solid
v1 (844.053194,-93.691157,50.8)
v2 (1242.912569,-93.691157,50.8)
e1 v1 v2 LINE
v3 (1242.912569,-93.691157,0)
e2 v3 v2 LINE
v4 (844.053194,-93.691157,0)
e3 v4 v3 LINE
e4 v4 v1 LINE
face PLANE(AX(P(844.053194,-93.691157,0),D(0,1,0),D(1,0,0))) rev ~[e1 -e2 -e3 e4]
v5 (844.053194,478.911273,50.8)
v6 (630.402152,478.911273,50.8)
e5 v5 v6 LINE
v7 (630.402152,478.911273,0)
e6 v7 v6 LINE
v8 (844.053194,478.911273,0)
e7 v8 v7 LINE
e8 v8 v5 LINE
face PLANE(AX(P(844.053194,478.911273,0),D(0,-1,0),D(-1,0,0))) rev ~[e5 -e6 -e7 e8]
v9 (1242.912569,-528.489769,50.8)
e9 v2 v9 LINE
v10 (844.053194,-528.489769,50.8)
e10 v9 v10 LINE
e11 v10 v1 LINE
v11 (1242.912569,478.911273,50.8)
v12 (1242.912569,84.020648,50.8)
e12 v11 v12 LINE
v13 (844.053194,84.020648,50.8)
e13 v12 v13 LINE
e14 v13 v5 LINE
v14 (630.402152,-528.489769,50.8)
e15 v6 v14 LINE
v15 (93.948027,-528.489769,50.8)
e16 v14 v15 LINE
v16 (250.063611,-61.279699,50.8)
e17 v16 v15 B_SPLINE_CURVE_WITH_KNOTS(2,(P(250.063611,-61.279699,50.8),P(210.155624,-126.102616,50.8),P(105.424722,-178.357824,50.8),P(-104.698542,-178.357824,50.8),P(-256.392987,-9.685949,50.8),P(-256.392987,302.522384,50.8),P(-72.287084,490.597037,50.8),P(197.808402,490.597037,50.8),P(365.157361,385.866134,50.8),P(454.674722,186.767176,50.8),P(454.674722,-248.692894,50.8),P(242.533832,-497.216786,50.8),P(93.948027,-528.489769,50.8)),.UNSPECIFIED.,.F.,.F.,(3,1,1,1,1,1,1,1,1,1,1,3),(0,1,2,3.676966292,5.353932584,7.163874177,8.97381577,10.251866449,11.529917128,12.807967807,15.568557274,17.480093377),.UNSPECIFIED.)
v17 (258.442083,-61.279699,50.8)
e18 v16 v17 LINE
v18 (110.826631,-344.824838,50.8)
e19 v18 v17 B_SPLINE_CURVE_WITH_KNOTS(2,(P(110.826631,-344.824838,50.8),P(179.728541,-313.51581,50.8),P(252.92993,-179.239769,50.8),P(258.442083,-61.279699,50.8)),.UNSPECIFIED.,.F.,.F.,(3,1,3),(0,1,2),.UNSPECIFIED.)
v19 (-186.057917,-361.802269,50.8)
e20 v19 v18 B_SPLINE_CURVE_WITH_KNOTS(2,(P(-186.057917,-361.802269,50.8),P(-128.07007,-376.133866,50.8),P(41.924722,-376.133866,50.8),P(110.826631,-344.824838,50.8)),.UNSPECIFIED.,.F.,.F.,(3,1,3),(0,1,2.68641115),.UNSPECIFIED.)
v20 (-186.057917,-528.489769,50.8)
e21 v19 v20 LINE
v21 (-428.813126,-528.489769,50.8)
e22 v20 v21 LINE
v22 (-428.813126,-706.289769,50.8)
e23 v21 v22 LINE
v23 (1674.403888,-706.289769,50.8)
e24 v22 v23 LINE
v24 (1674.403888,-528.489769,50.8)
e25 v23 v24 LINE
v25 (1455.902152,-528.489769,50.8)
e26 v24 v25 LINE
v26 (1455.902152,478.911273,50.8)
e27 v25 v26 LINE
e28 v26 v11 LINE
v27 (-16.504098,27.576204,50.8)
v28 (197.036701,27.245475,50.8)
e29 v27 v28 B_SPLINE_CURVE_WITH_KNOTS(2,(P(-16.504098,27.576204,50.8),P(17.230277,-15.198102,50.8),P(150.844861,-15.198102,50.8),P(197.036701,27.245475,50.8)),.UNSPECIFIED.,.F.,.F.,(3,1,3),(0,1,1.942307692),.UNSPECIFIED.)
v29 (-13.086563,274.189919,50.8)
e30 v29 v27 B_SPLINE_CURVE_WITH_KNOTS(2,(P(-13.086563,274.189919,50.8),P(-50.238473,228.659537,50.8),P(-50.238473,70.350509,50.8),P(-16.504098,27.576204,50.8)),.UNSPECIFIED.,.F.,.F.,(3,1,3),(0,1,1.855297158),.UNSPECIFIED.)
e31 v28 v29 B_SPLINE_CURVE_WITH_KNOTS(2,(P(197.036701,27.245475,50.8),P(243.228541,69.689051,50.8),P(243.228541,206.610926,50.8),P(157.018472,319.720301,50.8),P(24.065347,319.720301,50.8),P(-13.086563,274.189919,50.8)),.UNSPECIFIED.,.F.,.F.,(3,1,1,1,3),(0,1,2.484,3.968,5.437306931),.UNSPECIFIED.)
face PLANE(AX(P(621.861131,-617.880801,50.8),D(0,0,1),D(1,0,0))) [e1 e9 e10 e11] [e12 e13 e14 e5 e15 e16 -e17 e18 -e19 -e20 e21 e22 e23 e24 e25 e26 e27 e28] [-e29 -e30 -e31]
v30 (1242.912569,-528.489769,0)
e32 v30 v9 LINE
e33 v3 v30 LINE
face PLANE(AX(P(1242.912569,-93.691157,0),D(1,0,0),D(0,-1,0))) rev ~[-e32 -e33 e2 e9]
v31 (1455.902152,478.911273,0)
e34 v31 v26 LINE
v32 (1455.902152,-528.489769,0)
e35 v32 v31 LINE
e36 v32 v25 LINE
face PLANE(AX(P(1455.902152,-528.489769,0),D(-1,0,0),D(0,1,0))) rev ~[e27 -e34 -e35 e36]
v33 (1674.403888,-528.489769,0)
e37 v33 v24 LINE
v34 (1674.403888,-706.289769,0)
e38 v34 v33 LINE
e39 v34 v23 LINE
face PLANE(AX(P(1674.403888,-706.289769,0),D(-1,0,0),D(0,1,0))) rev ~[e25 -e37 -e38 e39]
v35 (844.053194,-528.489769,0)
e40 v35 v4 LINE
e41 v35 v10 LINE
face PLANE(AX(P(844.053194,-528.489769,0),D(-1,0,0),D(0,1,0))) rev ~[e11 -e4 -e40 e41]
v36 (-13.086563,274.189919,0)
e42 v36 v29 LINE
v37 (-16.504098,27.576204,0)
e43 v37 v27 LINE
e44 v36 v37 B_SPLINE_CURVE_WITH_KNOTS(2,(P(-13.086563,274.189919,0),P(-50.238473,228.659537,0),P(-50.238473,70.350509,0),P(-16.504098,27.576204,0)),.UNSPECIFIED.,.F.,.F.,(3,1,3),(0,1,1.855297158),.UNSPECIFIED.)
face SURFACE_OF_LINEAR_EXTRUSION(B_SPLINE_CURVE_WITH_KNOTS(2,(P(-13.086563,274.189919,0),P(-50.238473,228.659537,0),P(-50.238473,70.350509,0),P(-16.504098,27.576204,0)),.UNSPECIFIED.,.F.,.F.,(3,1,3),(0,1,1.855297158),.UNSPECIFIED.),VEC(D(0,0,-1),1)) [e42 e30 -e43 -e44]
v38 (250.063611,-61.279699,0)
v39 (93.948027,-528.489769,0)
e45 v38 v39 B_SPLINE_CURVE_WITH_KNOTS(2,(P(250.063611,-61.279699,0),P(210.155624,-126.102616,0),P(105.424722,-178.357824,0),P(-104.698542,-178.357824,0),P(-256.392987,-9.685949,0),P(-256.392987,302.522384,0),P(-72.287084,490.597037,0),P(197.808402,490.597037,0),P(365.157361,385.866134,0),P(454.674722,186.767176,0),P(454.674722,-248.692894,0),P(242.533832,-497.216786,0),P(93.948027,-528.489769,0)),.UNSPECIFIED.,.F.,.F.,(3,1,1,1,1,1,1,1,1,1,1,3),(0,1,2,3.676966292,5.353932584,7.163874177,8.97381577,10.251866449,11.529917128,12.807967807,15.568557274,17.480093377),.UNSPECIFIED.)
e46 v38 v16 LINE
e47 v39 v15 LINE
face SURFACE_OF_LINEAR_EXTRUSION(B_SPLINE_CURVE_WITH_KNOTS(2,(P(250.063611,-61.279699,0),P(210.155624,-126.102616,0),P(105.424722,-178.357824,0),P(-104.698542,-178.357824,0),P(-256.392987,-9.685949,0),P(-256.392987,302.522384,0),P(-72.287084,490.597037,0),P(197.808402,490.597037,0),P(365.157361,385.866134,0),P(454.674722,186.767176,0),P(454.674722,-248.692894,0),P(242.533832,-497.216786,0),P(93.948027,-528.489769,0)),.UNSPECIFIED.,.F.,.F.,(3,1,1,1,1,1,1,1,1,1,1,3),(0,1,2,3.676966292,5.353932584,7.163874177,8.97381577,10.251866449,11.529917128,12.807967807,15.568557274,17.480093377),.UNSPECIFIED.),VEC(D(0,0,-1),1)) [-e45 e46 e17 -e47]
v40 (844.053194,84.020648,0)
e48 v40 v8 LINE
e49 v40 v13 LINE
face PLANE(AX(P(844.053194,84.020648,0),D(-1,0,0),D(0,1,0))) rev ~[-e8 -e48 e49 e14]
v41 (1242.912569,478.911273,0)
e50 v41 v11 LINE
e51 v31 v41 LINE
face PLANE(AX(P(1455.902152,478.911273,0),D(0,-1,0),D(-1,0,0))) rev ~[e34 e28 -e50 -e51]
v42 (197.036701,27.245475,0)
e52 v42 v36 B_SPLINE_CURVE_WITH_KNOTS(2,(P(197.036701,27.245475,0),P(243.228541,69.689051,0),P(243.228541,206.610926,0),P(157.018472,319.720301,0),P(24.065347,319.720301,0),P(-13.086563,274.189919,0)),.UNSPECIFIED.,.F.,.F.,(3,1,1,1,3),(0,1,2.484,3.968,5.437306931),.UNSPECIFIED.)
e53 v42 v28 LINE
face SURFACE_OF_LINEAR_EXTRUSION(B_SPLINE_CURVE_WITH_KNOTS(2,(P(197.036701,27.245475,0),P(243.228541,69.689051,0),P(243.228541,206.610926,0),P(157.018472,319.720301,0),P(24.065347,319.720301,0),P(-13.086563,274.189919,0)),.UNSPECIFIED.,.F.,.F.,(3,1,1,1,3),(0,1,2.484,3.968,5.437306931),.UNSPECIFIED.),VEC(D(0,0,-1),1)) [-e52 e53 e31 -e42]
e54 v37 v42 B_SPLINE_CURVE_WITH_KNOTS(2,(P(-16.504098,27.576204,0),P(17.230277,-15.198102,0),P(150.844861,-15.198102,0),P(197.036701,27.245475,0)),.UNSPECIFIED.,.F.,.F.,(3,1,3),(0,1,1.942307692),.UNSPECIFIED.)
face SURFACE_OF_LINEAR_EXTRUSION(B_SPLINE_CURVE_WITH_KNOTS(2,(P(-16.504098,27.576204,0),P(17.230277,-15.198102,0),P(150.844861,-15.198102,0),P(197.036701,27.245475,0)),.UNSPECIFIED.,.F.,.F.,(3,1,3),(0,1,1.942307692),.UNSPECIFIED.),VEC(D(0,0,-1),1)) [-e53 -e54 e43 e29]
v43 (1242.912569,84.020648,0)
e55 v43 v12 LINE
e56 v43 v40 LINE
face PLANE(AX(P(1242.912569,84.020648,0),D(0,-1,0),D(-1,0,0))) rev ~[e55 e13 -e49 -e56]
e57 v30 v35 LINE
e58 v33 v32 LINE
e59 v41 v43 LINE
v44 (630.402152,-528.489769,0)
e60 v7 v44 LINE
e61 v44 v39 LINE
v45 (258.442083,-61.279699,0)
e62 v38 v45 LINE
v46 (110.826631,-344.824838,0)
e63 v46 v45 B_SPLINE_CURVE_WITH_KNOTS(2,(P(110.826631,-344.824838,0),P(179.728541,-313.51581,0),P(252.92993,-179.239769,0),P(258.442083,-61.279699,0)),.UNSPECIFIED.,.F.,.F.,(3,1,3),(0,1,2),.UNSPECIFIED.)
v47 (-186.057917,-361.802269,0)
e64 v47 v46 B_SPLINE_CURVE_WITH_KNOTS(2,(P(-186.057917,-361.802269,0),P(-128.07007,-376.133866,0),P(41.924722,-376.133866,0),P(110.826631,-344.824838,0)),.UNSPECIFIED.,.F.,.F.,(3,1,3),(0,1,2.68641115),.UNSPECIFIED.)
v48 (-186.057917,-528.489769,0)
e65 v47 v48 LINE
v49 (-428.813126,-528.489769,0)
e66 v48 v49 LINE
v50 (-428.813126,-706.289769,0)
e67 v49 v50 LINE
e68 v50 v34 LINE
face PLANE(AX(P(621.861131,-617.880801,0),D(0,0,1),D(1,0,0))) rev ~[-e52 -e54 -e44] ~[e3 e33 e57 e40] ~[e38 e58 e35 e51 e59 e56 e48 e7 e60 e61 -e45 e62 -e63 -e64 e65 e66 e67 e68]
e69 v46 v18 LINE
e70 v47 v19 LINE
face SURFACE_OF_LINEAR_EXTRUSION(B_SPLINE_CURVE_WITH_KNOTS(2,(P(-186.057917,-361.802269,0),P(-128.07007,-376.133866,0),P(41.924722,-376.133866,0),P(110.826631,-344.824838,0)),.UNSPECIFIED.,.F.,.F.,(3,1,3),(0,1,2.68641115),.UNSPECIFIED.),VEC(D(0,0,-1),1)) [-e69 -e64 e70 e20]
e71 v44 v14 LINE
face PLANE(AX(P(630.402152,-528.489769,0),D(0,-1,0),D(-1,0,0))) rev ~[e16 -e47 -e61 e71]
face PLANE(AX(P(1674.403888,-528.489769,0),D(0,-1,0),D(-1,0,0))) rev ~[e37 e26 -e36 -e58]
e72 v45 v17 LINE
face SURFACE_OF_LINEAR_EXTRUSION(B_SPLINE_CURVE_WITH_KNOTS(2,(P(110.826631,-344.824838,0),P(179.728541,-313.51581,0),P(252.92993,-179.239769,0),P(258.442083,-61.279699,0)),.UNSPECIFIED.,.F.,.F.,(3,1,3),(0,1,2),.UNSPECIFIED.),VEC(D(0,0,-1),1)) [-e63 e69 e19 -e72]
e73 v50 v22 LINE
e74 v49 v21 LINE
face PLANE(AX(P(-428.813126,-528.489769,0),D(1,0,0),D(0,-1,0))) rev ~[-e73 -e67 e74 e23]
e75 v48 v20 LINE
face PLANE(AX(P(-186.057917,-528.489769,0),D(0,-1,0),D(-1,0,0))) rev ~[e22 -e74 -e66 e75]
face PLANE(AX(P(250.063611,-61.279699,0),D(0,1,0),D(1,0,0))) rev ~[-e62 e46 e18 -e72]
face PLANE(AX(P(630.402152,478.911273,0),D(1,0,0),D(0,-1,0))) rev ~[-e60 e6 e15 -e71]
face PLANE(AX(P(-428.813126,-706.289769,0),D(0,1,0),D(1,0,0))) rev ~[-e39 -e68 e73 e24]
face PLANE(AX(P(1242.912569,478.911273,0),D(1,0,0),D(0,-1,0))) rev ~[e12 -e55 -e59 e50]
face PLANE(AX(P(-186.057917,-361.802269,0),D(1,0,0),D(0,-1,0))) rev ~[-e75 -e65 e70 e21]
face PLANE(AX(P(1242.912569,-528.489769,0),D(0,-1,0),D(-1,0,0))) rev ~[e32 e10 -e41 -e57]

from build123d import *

# Parameters (mm, degrees)
F1_DEPTH = 50.8


# Not quite as in the source:
# - a feature names something its author has since deleted; it is built from what else it names


with BuildPart() as f1:
    # F0 (on Top) → F1 (new body)
    with BuildSketch(Plane.XY):
        with BuildLine():
            Line((-428.8131256104, -528.4897685051), (-428.8131256104, -706.2897685051))
            Line((-428.8131256104, -706.2897685051), (1674.4038882785, -706.2897685051))
            Line((1674.4038882785, -706.2897685051), (1674.4038882785, -528.4897685051))
            Line((1674.4038882785, -528.4897685051), (1455.9021521674, -528.4897685051))
            Line((1455.9021521674, -528.4897685051), (1242.9125688341, -528.4897685051))
            Line((1242.9125688341, -528.4897685051), (844.0531938341, -528.4897685051))
            Line((844.0531938341, -528.4897685051), (630.4021521674, -528.4897685051))
            Line((630.4021521674, -528.4897685051), (93.9480274003, -528.4897685051))
            add(Edge.make_bspline(
                [(93.9480274003, -528.4897685051), (27.9501754164, -542.3803935051), (-50.2384728326, -542.3803935051)],
                knots=[0.6924376574, 0.6924376574, 0.6924376574, 1, 1, 1], degree=2))
            add(Edge.make_bspline(
                [(-50.2384728326, -542.3803935051), (-139.9763200548, -542.3803935051), (-186.057917277, -532.6790046162)],
                knots=[0, 0, 0, 1, 1, 1], degree=2))
            Line((-186.057917277, -532.6790046162), (-186.057917277, -528.4897685051))
            Line((-186.057917277, -528.4897685051), (-428.8131256104, -528.4897685051))
        make_face()
        Polygon((1242.9125688341, -528.4897685051), (1455.9021521674, -528.4897685051), (1455.9021521674, 478.9112731616), (1242.9125688341, 478.9112731616), (1242.9125688341, 84.0206481616), (844.0531938341, 84.0206481616), (844.0531938341, 478.9112731616), (630.4021521674, 478.9112731616), (630.4021521674, -528.4897685051), (844.0531938341, -528.4897685051), (844.0531938341, -93.691157394), (1242.9125688341, -93.691157394), align=None)
        with BuildLine():
            Line((-186.057917277, -361.8022685051), (-186.057917277, -528.4897685051))
            Line((-186.057917277, -528.4897685051), (93.9480274003, -528.4897685051))
            add(Edge.make_bspline(
                [(329.3283674452, -395.5366435051), (242.5338316042, -497.2167857568), (93.9480274003, -528.4897685051)],
                knots=[0, 0, 0, 0.6924376574, 0.6924376574, 0.6924376574], degree=2))
            add(Edge.make_bspline(
                [(454.6747216119, 48.9633564949), (454.6747216119, -248.6928935051), (329.3283674452, -395.5366435051)],
                knots=[0, 0, 0, 1, 1, 1], degree=2))
            add(Edge.make_bspline(
                [(409.9160410563, 286.316655106), (454.6747216119, 186.7671759393), (454.6747216119, 48.9633564949)],
                knots=[0, 0, 0, 1, 1, 1], degree=2))
            add(Edge.make_bspline(
                [(281.4828813341, 438.2315856616), (365.1573605008, 385.8661342727), (409.9160410563, 286.316655106)],
                knots=[0, 0, 0, 1, 1, 1], degree=2))
            add(Edge.make_bspline(
                [(86.0219438341, 490.5970370505), (197.8084021674, 490.5970370505), (281.4828813341, 438.2315856616)],
                knots=[0, 0, 0, 1, 1, 1], degree=2))
            add(Edge.make_bspline(
                [(-164.3400353326, 396.5597106616), (-72.2870839437, 490.5970370505), (86.0219438341, 490.5970370505)],
                knots=[0, 0, 0, 1, 1, 1], degree=2))
            add(Edge.make_bspline(
                [(-256.3929867215, 140.465092606), (-256.3929867215, 302.5223842727), (-164.3400353326, 396.5597106616)],
                knots=[0, 0, 0, 1, 1, 1], degree=2))
            add(Edge.make_bspline(
                [(-180.5457644992, -94.0218865607), (-256.3929867215, -9.6859490607), (-256.3929867215, 140.465092606)],
                knots=[0, 0, 0, 1, 1, 1], degree=2))
            add(Edge.make_bspline(
                [(26.9316660563, -178.3578240607), (-104.698542277, -178.3578240607), (-180.5457644992, -94.0218865607)],
                knots=[0, 0, 0, 1, 1, 1], degree=2))
            add(Edge.make_bspline(
                [(157.7901730008, -152.230219894), (105.4247216119, -178.3578240607), (26.9316660563, -178.3578240607)],
                knots=[0, 0, 0, 1, 1, 1], degree=2))
            add(Edge.make_bspline(
                [(250.0636105008, -61.2796990607), (210.1556243896, -126.1026157273), (157.7901730008, -152.230219894)],
                knots=[0, 0, 0, 1, 1, 1], degree=2))
            Line((250.0636105008, -61.2796990607), (258.442082723, -61.2796990607))
            add(Edge.make_bspline(
                [(216.3292355008, -246.3777893384), (252.9299299452, -179.2397685051), (258.442082723, -61.2796990607)],
                knots=[0, 0, 0, 1, 1, 1], degree=2))
            add(Edge.make_bspline(
                [(110.8266313341, -344.8248379495), (179.7285410563, -313.5158101718), (216.3292355008, -246.3777893384)],
                knots=[0, 0, 0, 1, 1, 1], degree=2))
            add(Edge.make_bspline(
                [(-64.7905561659, -376.1338657273), (41.9247216119, -376.1338657273), (110.8266313341, -344.8248379495)],
                knots=[0, 0, 0, 1, 1, 1], degree=2))
            add(Edge.make_bspline(
                [(-186.057917277, -361.8022685051), (-128.0700700548, -376.1338657273), (-64.7905561659, -376.1338657273)],
                knots=[0, 0, 0, 1, 1, 1], degree=2))
        make_face()
        with BuildLine():
            add(Edge.make_bspline(
                [(90.2111799452, 319.7203009393), (24.0653466119, 319.7203009393), (-13.0865631104, 274.1899189949)],
                knots=[0, 0, 0, 1, 1, 1], degree=2))
            add(Edge.make_bspline(
                [(200.1235063341, 263.1656134393), (157.0184716119, 319.7203009393), (90.2111799452, 319.7203009393)],
                knots=[0, 0, 0, 1, 1, 1], degree=2))
            add(Edge.make_bspline(
                [(243.2285410563, 124.8105787171), (243.2285410563, 206.6109259393), (200.1235063341, 263.1656134393)],
                knots=[0, 0, 0, 1, 1, 1], degree=2))
            add(Edge.make_bspline(
                [(197.0367007785, 27.2454745505), (243.2285410563, 69.6890509393), (243.2285410563, 124.8105787171)],
                knots=[0, 0, 0, 1, 1, 1], degree=2))
            add(Edge.make_bspline(
                [(86.0219438341, -15.1981018384), (150.8448605008, -15.1981018384), (197.0367007785, 27.2454745505)],
                knots=[0, 0, 0, 1, 1, 1], degree=2))
            add(Edge.make_bspline(
                [(-16.5040978326, 27.5762037171), (17.2302771674, -15.1981018384), (86.0219438341, -15.1981018384)],
                knots=[0, 0, 0, 1, 1, 1], degree=2))
            add(Edge.make_bspline(
                [(-50.2384728326, 143.3314120505), (-50.2384728326, 70.3505092727), (-16.5040978326, 27.5762037171)],
                knots=[0, 0, 0, 1, 1, 1], degree=2))
            add(Edge.make_bspline(
                [(-13.0865631104, 274.1899189949), (-50.2384728326, 228.6595370505), (-50.2384728326, 143.3314120505)],
                knots=[0, 0, 0, 1, 1, 1], degree=2))
        make_face(mode=Mode.SUBTRACT)
        with BuildLine():
            Line((93.9480274003, -528.4897685051), (-186.057917277, -528.4897685051))
            Line((-186.057917277, -528.4897685051), (-186.057917277, -532.6790046162))
            add(Edge.make_bspline(
                [(-50.2384728326, -542.3803935051), (-139.9763200548, -542.3803935051), (-186.057917277, -532.6790046162)],
                knots=[0, 0, 0, 1, 1, 1], degree=2))
            add(Edge.make_bspline(
                [(93.9480274003, -528.4897685051), (27.9501754164, -542.3803935051), (-50.2384728326, -542.3803935051)],
                knots=[0.6924376574, 0.6924376574, 0.6924376574, 1, 1, 1], degree=2))
        make_face()
    extrude(amount=F1_DEPTH)


solid = f1.part
